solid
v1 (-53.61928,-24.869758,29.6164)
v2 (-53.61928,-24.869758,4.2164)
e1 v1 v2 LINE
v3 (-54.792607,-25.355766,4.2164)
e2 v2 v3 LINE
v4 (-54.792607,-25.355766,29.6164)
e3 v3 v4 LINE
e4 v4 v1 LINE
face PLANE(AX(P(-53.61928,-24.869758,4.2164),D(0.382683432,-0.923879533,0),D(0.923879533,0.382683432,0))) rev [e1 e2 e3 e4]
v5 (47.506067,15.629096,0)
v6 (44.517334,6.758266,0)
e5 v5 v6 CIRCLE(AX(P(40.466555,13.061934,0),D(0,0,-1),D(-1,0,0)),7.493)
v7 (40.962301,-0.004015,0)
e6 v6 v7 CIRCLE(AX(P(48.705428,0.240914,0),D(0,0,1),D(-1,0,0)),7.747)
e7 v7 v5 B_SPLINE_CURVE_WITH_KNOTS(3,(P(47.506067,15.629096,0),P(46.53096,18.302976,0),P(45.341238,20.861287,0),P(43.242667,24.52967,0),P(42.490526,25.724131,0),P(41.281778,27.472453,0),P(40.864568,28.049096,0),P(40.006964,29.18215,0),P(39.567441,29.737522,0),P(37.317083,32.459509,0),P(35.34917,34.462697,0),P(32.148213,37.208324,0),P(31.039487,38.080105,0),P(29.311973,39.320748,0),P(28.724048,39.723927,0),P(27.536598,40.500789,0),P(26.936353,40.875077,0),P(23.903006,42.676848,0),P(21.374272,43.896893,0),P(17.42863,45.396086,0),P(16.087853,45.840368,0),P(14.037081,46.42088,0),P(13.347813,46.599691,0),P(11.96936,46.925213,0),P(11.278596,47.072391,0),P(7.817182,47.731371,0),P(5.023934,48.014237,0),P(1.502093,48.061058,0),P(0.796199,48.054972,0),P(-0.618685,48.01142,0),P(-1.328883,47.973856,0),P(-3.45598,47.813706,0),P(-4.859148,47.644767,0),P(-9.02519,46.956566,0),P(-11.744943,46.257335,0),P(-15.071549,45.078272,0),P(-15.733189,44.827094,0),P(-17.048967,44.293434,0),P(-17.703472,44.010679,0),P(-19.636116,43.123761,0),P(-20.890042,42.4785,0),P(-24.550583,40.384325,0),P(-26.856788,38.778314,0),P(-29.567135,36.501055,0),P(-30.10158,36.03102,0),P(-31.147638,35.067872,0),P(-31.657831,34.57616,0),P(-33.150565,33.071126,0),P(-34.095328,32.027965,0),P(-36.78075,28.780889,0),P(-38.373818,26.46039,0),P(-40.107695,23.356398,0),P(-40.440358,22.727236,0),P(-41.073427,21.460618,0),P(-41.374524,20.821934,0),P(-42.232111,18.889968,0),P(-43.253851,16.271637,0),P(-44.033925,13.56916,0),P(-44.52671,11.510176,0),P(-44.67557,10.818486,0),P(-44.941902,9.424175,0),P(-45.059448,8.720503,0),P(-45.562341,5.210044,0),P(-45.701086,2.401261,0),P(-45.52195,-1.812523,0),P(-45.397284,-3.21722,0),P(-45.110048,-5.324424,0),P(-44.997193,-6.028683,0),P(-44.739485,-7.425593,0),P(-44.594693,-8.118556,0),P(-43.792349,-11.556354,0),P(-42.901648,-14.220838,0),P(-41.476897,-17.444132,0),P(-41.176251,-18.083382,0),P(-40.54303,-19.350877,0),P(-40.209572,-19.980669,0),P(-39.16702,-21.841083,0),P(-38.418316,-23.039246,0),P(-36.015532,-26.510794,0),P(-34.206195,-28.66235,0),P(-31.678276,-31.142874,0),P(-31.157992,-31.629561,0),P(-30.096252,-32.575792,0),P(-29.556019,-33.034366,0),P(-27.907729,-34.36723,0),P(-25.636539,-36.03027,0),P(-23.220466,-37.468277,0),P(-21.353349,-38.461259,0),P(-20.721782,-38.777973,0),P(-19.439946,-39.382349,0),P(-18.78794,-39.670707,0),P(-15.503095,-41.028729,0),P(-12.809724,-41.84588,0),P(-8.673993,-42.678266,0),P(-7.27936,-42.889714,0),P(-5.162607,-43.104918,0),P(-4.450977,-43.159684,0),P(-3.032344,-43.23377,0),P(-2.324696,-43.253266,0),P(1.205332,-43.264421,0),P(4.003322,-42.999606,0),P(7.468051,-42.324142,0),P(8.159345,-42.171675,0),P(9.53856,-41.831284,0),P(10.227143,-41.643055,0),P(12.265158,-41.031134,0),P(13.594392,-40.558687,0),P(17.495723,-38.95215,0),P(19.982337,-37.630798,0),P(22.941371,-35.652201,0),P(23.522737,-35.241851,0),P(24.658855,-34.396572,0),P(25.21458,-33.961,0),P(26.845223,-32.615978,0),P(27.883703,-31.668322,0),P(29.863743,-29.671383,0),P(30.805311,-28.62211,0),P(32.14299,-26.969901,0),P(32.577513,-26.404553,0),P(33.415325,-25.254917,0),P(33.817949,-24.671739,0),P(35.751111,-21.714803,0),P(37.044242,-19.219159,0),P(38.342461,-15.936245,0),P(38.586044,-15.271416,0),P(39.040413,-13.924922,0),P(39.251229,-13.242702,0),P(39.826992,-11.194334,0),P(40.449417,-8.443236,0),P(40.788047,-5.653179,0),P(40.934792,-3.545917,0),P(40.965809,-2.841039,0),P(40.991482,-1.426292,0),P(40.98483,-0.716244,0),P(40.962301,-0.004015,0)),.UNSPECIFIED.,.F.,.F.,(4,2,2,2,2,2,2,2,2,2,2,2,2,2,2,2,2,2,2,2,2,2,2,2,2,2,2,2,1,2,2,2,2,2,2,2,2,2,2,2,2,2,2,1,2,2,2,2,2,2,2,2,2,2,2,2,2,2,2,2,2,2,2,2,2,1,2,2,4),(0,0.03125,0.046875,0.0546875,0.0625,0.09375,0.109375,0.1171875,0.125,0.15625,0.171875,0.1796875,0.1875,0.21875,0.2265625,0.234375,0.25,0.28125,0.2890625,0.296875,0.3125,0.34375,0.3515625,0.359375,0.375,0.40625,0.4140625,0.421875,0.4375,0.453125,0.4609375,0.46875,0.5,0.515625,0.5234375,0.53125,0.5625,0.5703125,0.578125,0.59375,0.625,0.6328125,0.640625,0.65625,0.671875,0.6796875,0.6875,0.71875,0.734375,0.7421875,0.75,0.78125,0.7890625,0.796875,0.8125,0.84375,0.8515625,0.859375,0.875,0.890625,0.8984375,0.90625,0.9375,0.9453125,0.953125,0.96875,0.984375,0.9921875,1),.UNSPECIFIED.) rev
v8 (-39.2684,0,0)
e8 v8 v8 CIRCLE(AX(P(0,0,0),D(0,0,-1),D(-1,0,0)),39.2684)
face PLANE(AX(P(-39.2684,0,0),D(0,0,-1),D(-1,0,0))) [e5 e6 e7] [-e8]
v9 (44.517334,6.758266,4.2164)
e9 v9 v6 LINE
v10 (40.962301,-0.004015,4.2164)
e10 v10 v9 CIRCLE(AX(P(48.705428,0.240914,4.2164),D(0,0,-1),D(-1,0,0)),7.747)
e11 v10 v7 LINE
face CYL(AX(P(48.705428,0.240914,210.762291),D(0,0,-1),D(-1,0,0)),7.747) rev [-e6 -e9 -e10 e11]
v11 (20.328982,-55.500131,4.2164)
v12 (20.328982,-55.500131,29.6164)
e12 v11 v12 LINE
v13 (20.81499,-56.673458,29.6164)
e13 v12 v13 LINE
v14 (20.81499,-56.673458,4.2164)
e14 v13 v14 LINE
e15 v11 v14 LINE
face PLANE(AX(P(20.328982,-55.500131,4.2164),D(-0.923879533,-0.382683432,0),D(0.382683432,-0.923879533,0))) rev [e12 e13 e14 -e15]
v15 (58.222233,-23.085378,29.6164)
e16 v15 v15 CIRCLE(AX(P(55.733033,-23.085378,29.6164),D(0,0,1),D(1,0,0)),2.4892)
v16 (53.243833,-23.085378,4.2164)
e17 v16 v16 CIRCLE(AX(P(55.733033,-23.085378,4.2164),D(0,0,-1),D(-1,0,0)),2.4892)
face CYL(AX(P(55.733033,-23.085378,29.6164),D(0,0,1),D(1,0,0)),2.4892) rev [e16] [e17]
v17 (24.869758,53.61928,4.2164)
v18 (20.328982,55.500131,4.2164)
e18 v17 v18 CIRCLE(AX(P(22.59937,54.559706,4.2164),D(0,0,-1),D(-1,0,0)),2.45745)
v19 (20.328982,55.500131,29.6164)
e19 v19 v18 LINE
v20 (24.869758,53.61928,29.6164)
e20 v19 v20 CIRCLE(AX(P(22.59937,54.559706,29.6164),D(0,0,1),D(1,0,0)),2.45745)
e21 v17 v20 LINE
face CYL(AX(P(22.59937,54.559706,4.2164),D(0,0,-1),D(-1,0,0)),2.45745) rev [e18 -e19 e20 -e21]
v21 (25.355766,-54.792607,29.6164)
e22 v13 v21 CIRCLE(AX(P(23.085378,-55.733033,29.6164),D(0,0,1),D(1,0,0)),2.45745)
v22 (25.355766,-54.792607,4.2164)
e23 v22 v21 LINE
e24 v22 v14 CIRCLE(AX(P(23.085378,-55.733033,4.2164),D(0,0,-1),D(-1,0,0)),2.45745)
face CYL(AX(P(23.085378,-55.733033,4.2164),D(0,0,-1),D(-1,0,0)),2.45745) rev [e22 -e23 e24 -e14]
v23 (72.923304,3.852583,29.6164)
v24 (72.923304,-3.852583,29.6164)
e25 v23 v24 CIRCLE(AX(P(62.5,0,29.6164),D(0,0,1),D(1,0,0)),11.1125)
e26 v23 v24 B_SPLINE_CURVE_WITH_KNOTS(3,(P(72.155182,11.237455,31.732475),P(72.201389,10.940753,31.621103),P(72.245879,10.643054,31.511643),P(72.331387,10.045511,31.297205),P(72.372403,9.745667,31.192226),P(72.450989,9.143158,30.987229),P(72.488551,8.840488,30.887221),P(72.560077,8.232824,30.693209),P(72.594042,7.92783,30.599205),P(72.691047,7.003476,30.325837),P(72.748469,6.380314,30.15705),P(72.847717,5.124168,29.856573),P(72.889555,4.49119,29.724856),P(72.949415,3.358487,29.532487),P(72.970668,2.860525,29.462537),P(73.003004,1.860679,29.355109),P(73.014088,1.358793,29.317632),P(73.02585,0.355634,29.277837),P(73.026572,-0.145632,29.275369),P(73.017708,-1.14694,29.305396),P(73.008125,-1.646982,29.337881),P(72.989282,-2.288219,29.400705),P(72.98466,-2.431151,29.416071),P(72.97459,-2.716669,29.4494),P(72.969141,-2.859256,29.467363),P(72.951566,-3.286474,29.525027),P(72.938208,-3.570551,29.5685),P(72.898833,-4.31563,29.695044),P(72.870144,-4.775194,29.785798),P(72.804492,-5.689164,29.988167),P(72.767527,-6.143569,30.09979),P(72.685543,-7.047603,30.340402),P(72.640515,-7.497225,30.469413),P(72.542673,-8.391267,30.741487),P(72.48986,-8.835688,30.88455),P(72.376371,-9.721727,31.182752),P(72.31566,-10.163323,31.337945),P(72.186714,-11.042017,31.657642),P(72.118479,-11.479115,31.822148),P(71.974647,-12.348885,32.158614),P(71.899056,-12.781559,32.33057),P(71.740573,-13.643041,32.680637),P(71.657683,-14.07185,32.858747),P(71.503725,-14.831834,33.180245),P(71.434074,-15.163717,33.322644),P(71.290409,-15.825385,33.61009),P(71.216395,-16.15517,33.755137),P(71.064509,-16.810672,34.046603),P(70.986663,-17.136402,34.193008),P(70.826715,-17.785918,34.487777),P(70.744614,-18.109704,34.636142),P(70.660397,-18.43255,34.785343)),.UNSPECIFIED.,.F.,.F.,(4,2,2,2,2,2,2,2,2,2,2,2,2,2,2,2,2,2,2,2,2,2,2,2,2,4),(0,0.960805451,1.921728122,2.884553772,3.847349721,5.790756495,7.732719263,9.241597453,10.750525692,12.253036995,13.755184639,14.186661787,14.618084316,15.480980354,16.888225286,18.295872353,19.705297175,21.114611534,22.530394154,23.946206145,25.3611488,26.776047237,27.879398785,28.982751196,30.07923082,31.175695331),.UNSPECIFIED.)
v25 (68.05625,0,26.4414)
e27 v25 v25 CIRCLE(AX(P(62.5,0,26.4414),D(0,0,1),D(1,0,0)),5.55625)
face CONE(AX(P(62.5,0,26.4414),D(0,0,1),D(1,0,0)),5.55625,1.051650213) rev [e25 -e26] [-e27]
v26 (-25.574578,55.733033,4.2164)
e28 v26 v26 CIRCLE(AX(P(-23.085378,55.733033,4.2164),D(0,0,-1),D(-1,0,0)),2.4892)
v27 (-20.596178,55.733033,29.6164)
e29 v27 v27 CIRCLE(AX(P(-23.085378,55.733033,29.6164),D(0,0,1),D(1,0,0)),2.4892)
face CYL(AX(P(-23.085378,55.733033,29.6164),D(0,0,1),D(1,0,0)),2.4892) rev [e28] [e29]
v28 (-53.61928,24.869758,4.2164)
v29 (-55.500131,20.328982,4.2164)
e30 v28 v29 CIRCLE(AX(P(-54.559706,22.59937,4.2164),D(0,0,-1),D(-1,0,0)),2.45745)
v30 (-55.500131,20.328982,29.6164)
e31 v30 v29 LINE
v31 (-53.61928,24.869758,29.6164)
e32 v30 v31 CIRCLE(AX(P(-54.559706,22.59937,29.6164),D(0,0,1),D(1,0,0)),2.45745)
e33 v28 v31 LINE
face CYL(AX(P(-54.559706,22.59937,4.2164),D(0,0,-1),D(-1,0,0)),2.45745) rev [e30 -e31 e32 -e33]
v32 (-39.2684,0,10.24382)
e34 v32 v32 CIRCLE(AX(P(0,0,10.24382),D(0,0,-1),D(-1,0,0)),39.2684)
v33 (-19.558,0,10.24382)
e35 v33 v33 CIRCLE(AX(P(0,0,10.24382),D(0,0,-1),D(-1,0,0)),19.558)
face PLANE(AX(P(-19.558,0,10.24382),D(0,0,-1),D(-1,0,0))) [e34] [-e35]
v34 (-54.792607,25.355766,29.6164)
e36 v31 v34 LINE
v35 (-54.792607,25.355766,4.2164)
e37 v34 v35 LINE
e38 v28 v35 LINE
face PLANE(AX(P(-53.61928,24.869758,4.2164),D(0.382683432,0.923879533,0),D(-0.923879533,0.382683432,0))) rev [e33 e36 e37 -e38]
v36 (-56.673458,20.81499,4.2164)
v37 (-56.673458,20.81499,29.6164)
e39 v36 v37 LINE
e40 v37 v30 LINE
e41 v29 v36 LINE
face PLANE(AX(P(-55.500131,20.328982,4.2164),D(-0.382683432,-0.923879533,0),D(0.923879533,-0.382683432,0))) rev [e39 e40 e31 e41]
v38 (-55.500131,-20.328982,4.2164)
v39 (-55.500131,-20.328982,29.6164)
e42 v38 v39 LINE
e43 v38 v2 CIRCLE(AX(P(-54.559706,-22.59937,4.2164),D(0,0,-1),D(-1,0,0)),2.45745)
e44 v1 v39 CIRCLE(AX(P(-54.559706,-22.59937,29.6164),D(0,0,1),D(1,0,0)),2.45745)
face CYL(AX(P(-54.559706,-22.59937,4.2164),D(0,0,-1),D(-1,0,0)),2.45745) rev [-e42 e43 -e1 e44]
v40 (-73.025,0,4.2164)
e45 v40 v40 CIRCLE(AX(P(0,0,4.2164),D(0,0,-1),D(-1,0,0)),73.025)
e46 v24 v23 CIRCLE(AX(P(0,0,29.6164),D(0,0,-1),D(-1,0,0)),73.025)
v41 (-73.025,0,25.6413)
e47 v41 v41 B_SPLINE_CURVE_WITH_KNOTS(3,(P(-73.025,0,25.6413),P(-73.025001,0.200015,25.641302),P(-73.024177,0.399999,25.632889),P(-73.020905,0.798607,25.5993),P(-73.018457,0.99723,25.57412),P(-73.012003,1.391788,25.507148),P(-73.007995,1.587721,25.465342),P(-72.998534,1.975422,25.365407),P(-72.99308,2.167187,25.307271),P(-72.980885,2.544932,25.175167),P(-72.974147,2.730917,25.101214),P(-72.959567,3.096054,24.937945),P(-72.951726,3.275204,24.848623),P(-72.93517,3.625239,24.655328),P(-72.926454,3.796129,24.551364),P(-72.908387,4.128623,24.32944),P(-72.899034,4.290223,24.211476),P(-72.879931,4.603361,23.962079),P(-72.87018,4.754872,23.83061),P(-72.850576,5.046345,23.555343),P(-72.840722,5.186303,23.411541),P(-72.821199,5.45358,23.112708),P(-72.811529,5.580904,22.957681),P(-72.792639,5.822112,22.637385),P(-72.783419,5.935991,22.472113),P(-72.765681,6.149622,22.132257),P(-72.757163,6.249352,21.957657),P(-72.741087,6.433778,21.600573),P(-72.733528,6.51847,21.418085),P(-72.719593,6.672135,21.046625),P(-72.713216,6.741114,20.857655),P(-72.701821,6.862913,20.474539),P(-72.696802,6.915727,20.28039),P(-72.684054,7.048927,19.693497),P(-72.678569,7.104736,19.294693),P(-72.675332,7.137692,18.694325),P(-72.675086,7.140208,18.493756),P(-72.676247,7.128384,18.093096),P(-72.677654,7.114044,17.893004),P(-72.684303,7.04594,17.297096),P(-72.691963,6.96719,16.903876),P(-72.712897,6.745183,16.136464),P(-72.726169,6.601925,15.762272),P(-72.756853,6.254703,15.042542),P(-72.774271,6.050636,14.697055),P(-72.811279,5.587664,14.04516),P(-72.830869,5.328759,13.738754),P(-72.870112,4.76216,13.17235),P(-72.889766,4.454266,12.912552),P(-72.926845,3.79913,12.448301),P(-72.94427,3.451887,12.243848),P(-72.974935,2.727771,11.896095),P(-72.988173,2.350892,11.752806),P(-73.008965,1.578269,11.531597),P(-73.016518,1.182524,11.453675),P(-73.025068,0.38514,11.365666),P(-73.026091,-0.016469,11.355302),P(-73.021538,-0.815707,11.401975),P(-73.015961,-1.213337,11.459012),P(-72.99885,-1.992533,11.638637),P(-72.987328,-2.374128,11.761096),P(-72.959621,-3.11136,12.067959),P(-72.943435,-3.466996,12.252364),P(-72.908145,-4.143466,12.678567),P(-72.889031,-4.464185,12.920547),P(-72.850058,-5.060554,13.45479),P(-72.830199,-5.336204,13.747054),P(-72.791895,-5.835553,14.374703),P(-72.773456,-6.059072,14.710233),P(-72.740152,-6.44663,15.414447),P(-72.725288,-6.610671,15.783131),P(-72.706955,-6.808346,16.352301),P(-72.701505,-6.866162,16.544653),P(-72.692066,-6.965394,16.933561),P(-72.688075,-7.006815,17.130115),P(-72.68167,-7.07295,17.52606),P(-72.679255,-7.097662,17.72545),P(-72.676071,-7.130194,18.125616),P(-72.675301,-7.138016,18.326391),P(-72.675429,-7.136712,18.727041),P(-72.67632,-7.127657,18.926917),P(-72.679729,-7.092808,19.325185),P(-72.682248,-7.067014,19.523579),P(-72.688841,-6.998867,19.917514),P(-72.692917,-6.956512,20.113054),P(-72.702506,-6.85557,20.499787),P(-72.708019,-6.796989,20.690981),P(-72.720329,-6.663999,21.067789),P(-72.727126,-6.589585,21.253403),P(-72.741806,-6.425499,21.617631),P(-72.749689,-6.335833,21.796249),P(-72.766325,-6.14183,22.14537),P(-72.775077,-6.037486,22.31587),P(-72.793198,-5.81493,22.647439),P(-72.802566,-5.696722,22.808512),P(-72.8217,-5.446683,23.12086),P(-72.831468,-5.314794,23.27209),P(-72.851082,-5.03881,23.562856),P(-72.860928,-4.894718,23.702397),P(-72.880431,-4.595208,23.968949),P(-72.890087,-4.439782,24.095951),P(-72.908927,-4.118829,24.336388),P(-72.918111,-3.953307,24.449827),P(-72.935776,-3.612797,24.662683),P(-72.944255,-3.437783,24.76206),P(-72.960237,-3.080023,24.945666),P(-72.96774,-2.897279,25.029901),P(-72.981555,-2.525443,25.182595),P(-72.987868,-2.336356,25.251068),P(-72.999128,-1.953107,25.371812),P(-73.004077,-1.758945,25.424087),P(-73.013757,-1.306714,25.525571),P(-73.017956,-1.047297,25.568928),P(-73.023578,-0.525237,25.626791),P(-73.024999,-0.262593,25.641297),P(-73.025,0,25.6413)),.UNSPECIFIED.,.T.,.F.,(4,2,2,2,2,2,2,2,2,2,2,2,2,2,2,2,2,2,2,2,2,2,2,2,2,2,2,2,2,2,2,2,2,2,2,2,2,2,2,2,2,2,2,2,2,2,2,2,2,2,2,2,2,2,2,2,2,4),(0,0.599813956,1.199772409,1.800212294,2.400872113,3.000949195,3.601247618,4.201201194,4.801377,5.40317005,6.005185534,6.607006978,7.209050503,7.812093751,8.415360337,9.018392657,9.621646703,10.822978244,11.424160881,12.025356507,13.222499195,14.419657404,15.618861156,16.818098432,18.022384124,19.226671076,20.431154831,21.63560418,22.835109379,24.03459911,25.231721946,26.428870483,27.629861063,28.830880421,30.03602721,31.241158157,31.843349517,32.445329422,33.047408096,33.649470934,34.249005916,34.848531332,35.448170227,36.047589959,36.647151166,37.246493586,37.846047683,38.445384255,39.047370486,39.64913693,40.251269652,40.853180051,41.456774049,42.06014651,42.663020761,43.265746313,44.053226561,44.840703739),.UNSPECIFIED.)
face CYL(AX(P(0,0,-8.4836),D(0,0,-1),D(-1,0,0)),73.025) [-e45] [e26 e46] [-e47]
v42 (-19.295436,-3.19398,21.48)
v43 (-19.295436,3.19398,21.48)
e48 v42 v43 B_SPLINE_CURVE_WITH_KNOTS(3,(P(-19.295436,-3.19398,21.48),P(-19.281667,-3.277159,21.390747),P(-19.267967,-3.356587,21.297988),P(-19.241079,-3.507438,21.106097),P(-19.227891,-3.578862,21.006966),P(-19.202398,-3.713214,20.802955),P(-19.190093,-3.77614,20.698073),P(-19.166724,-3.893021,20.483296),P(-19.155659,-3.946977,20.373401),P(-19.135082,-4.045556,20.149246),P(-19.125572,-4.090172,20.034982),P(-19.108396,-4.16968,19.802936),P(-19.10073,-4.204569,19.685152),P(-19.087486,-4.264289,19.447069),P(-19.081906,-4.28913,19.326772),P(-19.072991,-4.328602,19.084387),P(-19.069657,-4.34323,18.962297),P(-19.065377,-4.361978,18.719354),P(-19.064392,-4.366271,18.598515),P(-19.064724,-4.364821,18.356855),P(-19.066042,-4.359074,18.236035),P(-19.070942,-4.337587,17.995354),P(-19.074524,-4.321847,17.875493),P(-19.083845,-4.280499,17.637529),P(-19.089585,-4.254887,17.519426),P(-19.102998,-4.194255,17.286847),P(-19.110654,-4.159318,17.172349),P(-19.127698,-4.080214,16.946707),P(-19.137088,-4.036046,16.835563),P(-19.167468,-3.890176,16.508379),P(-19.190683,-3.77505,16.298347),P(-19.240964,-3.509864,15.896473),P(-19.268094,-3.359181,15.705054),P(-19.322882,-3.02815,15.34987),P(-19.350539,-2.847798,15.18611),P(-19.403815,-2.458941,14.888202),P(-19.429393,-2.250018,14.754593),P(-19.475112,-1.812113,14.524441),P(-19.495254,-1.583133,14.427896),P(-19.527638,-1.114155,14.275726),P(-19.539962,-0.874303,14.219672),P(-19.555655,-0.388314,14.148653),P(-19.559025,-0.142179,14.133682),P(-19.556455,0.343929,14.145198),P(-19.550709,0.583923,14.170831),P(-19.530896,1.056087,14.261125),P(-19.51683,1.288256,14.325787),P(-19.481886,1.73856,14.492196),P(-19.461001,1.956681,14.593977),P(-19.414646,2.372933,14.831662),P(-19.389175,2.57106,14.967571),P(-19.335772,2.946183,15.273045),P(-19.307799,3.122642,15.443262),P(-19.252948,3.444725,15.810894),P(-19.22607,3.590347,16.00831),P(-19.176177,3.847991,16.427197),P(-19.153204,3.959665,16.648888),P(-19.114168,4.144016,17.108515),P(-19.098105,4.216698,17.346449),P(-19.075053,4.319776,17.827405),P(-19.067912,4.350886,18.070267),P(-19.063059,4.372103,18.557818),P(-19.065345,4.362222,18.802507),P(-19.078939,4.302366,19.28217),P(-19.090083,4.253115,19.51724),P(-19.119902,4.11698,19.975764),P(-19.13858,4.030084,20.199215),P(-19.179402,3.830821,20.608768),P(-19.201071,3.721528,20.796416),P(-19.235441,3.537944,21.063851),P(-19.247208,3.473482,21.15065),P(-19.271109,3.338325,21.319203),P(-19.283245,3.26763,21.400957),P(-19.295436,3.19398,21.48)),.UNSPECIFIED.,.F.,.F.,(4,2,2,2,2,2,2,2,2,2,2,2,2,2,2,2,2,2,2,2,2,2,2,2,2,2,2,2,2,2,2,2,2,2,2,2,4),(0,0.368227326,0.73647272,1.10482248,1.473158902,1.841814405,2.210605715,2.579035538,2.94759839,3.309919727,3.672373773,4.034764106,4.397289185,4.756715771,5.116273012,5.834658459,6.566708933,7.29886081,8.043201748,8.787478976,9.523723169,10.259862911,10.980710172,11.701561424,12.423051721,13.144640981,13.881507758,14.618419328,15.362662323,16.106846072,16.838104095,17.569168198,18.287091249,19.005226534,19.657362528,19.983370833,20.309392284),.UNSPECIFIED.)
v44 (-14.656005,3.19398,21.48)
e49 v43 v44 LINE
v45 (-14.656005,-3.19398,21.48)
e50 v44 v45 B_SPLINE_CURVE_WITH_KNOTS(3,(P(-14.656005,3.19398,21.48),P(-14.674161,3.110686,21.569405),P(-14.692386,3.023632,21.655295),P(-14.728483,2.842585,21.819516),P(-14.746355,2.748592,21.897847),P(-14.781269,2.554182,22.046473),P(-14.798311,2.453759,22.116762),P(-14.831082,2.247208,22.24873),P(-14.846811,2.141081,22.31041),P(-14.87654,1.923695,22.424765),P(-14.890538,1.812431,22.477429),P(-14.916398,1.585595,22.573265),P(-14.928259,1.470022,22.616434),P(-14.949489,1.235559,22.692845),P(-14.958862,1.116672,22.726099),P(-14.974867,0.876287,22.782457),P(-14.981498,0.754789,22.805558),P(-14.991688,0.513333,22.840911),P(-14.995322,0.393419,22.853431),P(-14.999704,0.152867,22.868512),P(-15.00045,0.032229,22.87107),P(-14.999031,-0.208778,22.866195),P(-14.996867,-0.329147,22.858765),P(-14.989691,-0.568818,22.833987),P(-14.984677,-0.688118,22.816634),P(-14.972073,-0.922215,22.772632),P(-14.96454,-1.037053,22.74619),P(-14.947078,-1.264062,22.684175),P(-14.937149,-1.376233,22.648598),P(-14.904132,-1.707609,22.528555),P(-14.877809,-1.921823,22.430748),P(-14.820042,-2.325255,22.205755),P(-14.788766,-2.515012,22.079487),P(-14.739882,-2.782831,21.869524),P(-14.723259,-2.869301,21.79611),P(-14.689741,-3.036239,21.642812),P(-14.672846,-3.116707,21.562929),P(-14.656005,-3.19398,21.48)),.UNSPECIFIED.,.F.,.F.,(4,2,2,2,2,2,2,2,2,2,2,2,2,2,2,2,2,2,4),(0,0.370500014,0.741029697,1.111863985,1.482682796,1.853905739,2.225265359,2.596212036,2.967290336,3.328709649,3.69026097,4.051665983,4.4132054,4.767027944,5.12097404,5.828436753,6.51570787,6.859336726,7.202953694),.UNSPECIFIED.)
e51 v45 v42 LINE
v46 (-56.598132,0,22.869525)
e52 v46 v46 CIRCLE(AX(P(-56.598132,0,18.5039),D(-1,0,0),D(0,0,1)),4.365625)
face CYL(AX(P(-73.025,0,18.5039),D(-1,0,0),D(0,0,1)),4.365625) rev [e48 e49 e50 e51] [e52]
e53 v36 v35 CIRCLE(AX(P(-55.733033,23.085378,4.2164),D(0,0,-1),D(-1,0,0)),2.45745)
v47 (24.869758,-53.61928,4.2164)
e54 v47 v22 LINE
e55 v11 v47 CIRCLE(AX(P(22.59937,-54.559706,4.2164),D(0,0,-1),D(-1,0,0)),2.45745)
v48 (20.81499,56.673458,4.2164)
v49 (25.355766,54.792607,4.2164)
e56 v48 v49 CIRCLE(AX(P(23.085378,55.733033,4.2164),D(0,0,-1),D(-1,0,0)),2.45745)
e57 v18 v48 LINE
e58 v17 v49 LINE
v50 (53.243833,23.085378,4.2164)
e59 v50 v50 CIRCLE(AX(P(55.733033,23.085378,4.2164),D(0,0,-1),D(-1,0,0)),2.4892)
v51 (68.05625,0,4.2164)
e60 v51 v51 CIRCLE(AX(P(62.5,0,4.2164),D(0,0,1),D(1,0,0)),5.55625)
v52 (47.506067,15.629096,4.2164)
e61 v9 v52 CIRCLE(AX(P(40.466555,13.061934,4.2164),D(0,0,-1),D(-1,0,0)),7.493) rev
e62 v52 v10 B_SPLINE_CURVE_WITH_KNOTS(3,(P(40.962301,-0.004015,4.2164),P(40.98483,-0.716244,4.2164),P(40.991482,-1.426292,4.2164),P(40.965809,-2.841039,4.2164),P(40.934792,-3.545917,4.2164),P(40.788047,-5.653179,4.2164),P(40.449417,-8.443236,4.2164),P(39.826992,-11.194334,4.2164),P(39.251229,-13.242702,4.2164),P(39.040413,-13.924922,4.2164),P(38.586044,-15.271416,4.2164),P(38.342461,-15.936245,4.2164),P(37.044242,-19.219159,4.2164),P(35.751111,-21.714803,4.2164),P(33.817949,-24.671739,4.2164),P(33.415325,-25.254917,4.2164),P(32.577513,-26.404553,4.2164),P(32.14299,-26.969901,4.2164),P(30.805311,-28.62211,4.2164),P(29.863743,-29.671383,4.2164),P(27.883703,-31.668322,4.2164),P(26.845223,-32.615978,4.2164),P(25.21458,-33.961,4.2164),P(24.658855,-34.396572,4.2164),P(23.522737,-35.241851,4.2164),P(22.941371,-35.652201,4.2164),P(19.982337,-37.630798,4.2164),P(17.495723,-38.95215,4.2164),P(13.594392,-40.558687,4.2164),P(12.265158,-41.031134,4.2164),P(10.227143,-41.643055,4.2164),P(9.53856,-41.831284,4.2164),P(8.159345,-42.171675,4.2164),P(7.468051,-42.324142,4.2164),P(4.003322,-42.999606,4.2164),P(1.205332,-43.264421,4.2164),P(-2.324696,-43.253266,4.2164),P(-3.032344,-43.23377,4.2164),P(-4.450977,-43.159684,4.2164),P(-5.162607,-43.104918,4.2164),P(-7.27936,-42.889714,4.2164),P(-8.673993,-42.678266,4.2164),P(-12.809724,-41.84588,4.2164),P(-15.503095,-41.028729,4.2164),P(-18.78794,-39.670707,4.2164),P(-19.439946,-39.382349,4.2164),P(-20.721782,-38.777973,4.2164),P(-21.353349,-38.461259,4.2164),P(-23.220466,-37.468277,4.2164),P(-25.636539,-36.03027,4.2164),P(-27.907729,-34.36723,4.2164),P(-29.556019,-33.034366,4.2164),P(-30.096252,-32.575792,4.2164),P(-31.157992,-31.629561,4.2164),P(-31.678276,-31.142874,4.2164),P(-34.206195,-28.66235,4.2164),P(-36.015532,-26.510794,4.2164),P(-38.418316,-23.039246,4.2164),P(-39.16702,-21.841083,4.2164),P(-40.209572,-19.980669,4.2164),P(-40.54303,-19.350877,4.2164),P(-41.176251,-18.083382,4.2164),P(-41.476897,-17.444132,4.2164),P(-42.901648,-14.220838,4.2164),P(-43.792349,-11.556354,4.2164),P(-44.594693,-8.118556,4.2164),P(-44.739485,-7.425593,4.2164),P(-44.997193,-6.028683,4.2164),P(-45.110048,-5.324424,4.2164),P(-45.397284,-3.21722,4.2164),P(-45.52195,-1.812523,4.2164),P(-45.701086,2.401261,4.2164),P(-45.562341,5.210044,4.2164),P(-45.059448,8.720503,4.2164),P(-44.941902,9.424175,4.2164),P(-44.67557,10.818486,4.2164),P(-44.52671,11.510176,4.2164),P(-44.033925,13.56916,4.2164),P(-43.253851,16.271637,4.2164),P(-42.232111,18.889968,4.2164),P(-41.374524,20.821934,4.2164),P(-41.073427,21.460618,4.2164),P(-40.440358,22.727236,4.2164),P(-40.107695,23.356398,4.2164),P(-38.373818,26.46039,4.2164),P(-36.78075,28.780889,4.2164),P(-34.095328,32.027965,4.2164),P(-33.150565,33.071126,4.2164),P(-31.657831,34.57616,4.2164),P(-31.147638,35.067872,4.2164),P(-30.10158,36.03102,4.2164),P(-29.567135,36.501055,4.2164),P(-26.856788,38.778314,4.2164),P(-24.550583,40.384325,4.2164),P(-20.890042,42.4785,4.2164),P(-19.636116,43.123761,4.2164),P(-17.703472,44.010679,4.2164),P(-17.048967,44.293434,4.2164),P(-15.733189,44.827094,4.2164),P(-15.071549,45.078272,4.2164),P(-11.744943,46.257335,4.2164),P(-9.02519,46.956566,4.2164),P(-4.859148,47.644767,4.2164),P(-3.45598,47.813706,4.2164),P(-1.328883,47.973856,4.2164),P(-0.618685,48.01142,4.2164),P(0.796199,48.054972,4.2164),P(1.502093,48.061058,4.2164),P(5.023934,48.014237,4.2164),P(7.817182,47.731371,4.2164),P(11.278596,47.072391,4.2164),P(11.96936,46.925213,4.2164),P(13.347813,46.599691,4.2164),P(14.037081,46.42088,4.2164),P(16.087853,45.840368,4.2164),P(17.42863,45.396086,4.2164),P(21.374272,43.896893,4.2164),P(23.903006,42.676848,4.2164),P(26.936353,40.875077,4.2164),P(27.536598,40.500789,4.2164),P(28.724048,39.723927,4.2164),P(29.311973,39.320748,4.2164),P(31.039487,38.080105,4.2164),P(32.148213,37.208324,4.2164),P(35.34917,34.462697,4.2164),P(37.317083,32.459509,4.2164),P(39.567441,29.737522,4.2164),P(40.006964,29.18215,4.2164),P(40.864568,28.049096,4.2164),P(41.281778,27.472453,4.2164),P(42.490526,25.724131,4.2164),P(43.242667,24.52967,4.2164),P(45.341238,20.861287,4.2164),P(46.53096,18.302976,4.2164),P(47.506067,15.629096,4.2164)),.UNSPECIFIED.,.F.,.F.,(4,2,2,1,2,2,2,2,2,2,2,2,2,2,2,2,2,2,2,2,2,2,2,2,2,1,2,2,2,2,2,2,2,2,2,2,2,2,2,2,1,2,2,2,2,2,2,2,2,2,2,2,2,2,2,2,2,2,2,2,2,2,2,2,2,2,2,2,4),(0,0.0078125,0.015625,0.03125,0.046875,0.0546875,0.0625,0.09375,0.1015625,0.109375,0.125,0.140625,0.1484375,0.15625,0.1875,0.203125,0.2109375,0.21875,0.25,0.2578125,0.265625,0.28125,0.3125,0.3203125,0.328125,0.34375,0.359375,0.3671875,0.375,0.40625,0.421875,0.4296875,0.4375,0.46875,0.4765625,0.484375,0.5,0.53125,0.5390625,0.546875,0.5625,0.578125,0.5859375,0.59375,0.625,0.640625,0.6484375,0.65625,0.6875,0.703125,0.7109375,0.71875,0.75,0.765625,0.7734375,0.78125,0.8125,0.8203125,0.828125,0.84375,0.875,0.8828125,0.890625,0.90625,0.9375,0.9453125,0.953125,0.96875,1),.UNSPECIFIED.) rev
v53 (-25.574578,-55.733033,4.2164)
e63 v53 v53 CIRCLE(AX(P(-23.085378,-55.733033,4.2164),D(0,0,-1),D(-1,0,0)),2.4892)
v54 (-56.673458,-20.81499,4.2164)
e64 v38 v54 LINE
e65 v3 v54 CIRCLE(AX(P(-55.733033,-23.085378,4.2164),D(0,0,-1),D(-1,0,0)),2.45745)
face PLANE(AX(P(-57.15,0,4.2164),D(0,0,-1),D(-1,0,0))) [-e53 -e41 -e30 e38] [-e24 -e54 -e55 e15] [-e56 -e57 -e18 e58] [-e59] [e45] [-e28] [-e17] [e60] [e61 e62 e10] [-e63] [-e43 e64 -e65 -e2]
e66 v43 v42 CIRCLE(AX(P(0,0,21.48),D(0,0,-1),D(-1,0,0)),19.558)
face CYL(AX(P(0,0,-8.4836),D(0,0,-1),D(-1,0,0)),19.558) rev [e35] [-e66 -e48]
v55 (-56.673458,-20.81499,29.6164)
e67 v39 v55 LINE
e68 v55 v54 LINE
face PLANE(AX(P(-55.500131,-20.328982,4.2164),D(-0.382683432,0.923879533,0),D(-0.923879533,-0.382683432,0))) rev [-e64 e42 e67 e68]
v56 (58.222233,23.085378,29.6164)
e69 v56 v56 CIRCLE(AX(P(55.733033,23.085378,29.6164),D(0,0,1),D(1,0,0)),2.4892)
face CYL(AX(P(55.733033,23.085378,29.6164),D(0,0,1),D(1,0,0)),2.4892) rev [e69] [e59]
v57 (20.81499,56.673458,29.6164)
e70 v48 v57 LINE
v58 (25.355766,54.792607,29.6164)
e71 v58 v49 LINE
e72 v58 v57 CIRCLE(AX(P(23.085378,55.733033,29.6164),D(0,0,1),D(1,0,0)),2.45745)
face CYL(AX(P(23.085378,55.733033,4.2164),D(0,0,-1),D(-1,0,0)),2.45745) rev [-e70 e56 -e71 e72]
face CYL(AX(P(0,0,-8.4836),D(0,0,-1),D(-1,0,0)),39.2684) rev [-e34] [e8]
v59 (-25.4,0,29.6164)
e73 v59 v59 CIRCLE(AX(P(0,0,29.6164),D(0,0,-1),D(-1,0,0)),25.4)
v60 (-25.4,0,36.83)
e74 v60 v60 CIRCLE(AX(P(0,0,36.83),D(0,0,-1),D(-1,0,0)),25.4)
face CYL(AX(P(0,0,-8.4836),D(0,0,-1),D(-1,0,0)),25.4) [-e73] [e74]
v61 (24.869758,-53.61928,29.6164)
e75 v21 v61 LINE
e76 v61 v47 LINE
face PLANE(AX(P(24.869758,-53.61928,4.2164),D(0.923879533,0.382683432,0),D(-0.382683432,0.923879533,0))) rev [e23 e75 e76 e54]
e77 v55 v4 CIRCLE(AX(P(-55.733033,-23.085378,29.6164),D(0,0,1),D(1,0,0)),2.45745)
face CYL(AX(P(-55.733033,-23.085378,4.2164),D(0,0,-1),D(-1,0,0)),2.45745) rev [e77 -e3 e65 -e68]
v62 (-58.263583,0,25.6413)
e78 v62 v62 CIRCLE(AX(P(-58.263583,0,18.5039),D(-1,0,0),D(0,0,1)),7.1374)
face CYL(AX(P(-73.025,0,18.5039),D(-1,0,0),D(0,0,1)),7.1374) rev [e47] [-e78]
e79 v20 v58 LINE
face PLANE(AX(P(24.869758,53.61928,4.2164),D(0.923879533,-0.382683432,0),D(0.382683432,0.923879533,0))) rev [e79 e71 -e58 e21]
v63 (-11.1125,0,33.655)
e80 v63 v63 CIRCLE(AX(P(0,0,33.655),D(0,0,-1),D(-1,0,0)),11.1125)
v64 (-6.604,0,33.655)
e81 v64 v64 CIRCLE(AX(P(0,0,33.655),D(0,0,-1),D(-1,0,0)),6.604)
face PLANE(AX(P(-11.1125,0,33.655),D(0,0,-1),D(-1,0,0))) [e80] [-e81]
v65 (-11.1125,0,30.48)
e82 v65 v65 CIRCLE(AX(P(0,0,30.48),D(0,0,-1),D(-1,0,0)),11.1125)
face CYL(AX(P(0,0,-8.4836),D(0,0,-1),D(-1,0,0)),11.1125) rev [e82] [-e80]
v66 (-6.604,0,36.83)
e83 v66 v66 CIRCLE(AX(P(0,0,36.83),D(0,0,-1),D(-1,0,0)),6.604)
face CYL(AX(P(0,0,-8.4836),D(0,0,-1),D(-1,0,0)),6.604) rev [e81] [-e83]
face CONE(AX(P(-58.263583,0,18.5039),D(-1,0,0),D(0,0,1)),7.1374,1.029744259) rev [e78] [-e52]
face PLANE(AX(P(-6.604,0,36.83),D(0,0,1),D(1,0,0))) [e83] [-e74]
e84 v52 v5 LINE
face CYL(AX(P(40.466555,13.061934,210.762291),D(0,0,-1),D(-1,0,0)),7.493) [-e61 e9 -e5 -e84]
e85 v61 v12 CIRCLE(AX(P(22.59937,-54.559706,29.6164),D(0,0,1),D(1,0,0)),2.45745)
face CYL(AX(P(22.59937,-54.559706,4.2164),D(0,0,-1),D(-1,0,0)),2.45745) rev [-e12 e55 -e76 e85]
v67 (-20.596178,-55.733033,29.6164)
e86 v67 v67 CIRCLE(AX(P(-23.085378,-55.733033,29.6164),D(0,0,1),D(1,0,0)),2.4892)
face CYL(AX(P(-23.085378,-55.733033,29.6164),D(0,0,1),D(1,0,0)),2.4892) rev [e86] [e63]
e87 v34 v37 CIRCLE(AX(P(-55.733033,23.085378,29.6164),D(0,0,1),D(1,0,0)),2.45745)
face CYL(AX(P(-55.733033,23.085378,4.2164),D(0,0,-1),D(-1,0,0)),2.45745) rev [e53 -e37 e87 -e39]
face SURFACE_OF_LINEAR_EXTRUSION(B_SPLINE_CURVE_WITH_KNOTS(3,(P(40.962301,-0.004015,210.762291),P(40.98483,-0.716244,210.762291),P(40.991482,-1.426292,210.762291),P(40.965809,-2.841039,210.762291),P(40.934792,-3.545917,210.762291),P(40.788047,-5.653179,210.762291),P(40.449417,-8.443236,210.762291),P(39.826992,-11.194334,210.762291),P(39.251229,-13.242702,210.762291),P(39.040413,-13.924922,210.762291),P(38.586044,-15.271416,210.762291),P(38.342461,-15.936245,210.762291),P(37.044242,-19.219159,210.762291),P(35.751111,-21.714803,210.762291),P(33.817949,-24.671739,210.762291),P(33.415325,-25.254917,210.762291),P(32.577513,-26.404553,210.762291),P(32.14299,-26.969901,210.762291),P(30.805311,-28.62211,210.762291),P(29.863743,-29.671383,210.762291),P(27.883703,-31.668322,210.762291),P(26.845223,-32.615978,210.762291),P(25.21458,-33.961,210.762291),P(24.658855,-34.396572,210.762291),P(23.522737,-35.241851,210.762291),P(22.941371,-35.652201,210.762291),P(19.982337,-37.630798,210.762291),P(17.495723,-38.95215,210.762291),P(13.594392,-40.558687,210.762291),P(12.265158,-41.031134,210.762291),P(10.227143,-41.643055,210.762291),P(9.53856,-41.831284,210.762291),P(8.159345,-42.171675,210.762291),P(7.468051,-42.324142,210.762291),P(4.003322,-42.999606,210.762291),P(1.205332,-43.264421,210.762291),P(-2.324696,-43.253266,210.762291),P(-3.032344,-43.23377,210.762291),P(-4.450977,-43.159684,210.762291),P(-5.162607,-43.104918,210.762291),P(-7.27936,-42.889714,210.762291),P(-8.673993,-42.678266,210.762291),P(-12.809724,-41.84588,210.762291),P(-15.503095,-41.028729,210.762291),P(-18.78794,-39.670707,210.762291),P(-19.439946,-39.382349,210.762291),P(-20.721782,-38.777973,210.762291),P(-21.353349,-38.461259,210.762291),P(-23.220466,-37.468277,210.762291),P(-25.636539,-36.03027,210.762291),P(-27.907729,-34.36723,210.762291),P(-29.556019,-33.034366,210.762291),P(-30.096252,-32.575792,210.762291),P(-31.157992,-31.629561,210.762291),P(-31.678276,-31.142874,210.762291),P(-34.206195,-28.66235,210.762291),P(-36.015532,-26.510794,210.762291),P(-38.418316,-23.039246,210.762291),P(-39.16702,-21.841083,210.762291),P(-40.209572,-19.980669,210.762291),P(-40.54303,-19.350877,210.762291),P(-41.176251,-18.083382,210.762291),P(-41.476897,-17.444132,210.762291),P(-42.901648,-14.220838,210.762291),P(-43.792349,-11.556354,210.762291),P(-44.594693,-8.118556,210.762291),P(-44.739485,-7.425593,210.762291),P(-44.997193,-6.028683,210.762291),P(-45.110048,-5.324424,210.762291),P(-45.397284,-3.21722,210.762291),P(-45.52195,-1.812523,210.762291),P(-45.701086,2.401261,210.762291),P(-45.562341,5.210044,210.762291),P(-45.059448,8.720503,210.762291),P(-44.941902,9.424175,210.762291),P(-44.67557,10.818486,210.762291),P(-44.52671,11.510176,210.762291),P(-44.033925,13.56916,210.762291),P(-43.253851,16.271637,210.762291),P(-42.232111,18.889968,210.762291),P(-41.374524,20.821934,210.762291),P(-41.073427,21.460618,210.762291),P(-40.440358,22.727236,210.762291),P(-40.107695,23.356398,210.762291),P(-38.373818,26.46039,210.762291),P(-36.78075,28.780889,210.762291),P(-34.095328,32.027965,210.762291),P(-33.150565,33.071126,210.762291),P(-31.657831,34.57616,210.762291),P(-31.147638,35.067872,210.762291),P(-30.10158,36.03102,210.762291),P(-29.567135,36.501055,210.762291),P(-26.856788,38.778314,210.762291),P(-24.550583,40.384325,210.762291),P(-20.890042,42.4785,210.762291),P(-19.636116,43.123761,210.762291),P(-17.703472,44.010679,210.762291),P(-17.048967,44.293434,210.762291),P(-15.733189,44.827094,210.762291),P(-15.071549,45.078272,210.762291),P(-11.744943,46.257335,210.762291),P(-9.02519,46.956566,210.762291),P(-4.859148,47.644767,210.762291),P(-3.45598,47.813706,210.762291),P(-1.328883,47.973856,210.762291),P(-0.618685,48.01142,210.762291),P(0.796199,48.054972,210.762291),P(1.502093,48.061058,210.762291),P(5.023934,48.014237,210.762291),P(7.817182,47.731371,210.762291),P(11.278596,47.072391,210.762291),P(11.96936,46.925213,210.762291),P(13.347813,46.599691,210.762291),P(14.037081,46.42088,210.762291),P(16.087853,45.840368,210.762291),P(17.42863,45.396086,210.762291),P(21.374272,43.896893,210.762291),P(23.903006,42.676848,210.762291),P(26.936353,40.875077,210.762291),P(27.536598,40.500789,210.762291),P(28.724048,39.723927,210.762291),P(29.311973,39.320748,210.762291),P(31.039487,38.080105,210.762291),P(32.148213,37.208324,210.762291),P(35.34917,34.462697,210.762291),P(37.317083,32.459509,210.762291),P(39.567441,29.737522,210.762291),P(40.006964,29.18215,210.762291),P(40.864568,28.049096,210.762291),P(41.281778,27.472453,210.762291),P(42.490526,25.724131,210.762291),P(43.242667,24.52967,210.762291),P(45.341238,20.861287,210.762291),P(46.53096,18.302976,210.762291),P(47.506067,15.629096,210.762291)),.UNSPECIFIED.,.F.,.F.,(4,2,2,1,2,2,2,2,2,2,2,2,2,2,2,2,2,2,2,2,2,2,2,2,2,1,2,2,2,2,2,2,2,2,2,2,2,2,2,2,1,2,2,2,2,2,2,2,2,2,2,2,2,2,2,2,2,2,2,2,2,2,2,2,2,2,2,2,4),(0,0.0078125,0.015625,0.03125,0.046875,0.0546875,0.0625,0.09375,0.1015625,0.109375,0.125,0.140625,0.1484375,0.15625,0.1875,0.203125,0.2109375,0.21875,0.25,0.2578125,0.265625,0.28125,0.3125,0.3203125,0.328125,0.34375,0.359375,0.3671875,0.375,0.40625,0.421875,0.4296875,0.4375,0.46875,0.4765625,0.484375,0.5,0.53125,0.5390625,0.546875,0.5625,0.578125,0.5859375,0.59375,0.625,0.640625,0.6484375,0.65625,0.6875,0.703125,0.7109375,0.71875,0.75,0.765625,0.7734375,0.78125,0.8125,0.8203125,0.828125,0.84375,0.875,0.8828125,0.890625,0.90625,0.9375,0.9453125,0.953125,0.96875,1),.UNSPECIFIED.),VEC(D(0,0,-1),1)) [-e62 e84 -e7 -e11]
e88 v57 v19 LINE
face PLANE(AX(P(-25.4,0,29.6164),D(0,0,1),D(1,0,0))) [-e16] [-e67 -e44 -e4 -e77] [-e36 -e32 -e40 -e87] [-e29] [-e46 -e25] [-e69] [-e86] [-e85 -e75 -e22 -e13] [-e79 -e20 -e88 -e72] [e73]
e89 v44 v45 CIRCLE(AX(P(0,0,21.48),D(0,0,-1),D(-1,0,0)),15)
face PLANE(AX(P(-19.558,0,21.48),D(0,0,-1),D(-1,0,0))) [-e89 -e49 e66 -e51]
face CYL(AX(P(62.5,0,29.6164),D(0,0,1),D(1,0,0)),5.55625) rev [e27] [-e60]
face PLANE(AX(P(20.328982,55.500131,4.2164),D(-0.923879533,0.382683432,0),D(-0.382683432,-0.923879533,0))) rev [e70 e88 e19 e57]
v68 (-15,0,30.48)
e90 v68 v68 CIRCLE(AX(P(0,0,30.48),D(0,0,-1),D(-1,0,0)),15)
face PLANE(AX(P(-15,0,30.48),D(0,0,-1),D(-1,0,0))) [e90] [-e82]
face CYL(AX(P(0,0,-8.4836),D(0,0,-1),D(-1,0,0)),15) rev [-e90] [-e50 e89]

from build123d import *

# Parameters (mm, degrees)
CUT_EXTRUDE1_START                   = 4.2164
SKETCH18_R                           = 57.15
CUT_EXTRUDE1_DEPTH                   = 4.2164
F_11_32_0_34375_DIAMETER_HOLE1_D     = 8.73125
F_11_32_0_34375_DIAMETER_HOLE1_DEPTH = 76.2
F_11_32_0_34375_DIAMETER_HOLE1_TIP   = 2.62313214
PIPE_TAP_DRILL_FOR_3_8_TAP2_D        = 14.2748
PIPE_TAP_DRILL_FOR_3_8_TAP2_DEPTH    = 14.761417418
PIPE_TAP_DRILL_FOR_3_8_TAP2_TIP      = 4.288582582
F_10_CLEARANCE_HOLE1_D               = 4.9784
CIRPATTERN1_COUNT                    = 8
CLEARANCING_START                    = -4.2164
SKETCH32_R                           = 73.025
CLEARANCING_DEPTH                    = 4.2164
F_10_START                           = 4.2164
F_10_0_1935_DIAMETER_SLOT1_DEPTH     = 25.4
CIRPATTERN2_COUNT                    = 8


# Read off the part's stored shape, not the designer's step: #10 (0.1935) Diameter Slot1
with BuildPart() as part:
    # Sketch25 → Revolve1 (revolve)
    with BuildSketch(Plane(origin=(0, 0, 0), x_dir=(1, 0, 0), z_dir=(0, 1, 0))):
        Polygon((-19.558, -21.48), (-19.558, -10.24382), (-39.2684, -10.24382), (-39.2684, 0), (-57.15, 0), (-57.15, -4.2164), (-73.025, -4.2164), (-73.025, -29.6164), (-25.4, -29.6164), (-25.4, -36.83), (-6.604, -36.83), (-6.604, -33.655), (-11.1125, -33.655), (-11.1125, -30.48), (-15, -30.48), (-15, -21.48), align=None)
    revolve(axis=Axis((0, 0, -8.4836), (0, 0, 1)))

    # Sketch18 → Cut-Extrude1 (cut)
    with BuildSketch(Plane.XY.offset(CUT_EXTRUDE1_START)):
        Circle(SKETCH18_R)
        with BuildLine():
            add(Edge.make_bspline(
                [(41.089237213, 0), (41.091962531, -0.086157587), (41.097413749, -0.258491166), (41.10355964, -0.517077072), (41.10820678, -0.775748178), (41.11421023, -1.293415642), (41.109015311, -2.589274196), (41.017814103, -4.490313926), (40.7831208, -6.729807087), (40.462314107, -8.787506492), (40.037808727, -10.829994254), (39.510298345, -12.852043551), (38.880746853, -14.848458078), (38.15038378, -16.814086746), (37.320701547, -18.743836999), (36.393451781, -20.63268838), (35.370641466, -22.475705706), (34.254528452, -24.268052099), (33.047616433, -26.005001751), (31.752649319, -27.681952446), (30.372605018, -29.294437787), (28.910688618, -30.83813911), (27.370324987, -32.308897058), (25.755150794, -33.702722776), (24.069005972, -35.015808715), (22.315924639, -36.244539), (20.500125495, -37.385499343), (18.62600172, -38.435486481), (16.698110388, -39.3915171), (14.721161433, -40.250836227), (12.700006186, -41.010925075), (10.639625512, -41.669508306), (8.545117571, -42.224560694), (6.421685244, -42.674313186), (4.274623243, -43.017258312), (2.109304944, -43.252154961), (-0.068831028, -43.378032487), (-2.254294428, -43.394194133), (-4.441557201, -43.300219785), (-6.625067428, -43.095968006), (-8.799263397, -42.781577389), (-10.958587737, -42.35746718), (-13.097501591, -41.8243372), (-15.210498799, -41.183167044), (-17.292120038, -40.435214565), (-19.336966901, -39.582013644), (-21.339715858, -38.62537124), (-23.295132091, -37.567363743), (-25.198083132, -36.410332623), (-27.043552306, -35.156879378), (-28.826651909, -33.809859817), (-30.542636113, -32.372377659), (-32.186913551, -30.847777489), (-33.75505955, -29.239637062), (-35.242827981, -27.551758997), (-36.6461627, -25.788161864), (-37.961208531, -23.953070684), (-39.184321792, -22.050906876), (-40.312080298, -20.086277666), (-41.34129285, -18.063964982), (-42.269008156, -15.988913871), (-43.092523175, -13.866220454), (-43.809390856, -11.701119456), (-44.417427247, -9.498971339), (-44.914717965, -7.265249075), (-45.299623986, -5.005524575), (-45.570786769, -2.725454833), (-45.727132667, -0.430767795), (-45.767876634, 1.872751999), (-45.692525205, 4.179277959), (-45.500878745, 6.482956161), (-45.193032951, 8.777920163), (-44.76937961, 11.058305925), (-44.2306066, 13.318266753), (-43.577697135, 15.551988265), (-42.811928261, 17.753703317), (-41.934868588, 19.917706858), (-40.948375273, 22.038370685), (-39.854590259, 24.110158043), (-38.655935769, 26.127638043), (-37.35510908, 28.085499861), (-35.95507656, 29.978566677), (-34.45906702, 31.801809315), (-32.870564351, 33.550359561), (-31.193299507, 35.2195231), (-29.431241811, 36.804792072), (-27.58858964, 38.301857174), (-25.669760482, 39.706619311), (-23.67938041, 41.015200739), (-21.62227298, 42.22395569), (-19.503447594, 43.329480427), (-17.328087349, 44.32862273), (-15.101536401, 45.218490759), (-12.829286876, 45.996461288), (-10.51696536, 46.660187279), (-8.170319005, 47.207604779), (-5.795201275, 47.63693911), (-3.397557376, 47.946710349), (-0.983409407, 48.13573807), (1.441158736, 48.203145338), (3.870016668, 48.148361942), (6.297002983, 47.971126851), (8.715940862, 47.671489899), (11.120653763, 47.249812672), (13.504981164, 46.706768607), (15.862794321, 46.043342297), (18.188011992, 45.260827993), (20.47461609, 44.360827321), (22.71666723, 43.345246195), (24.908320125, 42.216290953), (27.043838787, 40.976463712), (29.117611505, 39.628556947), (31.12416555, 38.175647316), (33.058181574, 36.621088743), (34.914507669, 34.968504765), (36.688173034, 33.221780166), (38.374401232, 31.385051924), (39.968622994, 29.462699478), (41.466488529, 27.459334348), (42.863879321, 25.37978913), (44.156919368, 23.229105887), (45.341985843, 21.012523976), (46.415719137, 18.735467323), (47.152873419, 16.943563677), (47.537044371, 15.914838228), (47.625380995, 15.672606956)],
                knots=[0, 0, 0, 0, 0.000898736, 0.001797664, 0.002696784, 0.003596095, 0.007195255, 0.016206602, 0.023429565, 0.030664921, 0.03791271, 0.04517297, 0.052445735, 0.059731037, 0.067028905, 0.074339368, 0.081662453, 0.088998186, 0.096346593, 0.103707696, 0.111081519, 0.118468084, 0.125867414, 0.13327953, 0.140704451, 0.148142199, 0.155592793, 0.163056252, 0.170532595, 0.178021841, 0.185524007, 0.193039111, 0.200567171, 0.208108204, 0.215662226, 0.223229255, 0.230809306, 0.238402396, 0.24600854, 0.253627754, 0.261260054, 0.268905454, 0.27656397, 0.284235617, 0.291920409, 0.29961836, 0.307329485, 0.315053798, 0.322791313, 0.330542044, 0.338306004, 0.346083208, 0.353873668, 0.361677398, 0.369494411, 0.37732472, 0.385168337, 0.393025277, 0.400895551, 0.408779172, 0.416676152, 0.424586504, 0.432510241, 0.440447374, 0.448397915, 0.456361877, 0.464339271, 0.472330109, 0.480334403, 0.488352164, 0.496383405, 0.504428136, 0.512486369, 0.520558115, 0.528643386, 0.536742193, 0.544854546, 0.552980457, 0.561119937, 0.569272997, 0.577439648, 0.585619899, 0.593813763, 0.60202125, 0.61024237, 0.618477134, 0.626725552, 0.634987634, 0.643263392, 0.651552835, 0.659855974, 0.668172818, 0.676503379, 0.684847665, 0.693205688, 0.701577457, 0.709962981, 0.718362272, 0.726775338, 0.73520219, 0.743642837, 0.752097289, 0.760565555, 0.769047646, 0.777543571, 0.786053339, 0.79457696, 0.803114443, 0.811665798, 0.820231034, 0.828810161, 0.837403187, 0.846010122, 0.854630975, 0.863265756, 0.871914473, 0.880577136, 0.889253753, 0.897944334, 0.906648887, 0.915367423, 0.924099948, 0.932846474, 0.941607007, 0.944295232, 0.944295232, 0.944295232, 0.944295232], degree=3))
            ThreePointArc((47.625380995, 15.672606956), (47.687720846, 10.629001226), (44.585991464, 6.651424093))
            ThreePointArc((44.585991464, 6.651424093), (41.960682048, 3.786728615), (41.089237213, 0))
        make_face(mode=Mode.SUBTRACT)
    extrude(amount=-CUT_EXTRUDE1_DEPTH, mode=Mode.SUBTRACT)

    # 11/32 (0.34375) Diameter Hole1
    with Locations(Plane(origin=(-73.025, 0, 18.5039), x_dir=(0, 0, -1), z_dir=(-1, 0, 0))):
        with Locations((0, 0)):
            Hole(F_11_32_0_34375_DIAMETER_HOLE1_D / 2, depth=F_11_32_0_34375_DIAMETER_HOLE1_DEPTH)
            with Locations((0, 0, -(F_11_32_0_34375_DIAMETER_HOLE1_DEPTH + F_11_32_0_34375_DIAMETER_HOLE1_TIP / 2))):  # 118° drill point
                Cone(0, F_11_32_0_34375_DIAMETER_HOLE1_D / 2, F_11_32_0_34375_DIAMETER_HOLE1_TIP, mode=Mode.SUBTRACT)

    # Sketch20 one side → Turbine Shaft Hole (revolve, cut)
    with BuildSketch(Plane(origin=(0, 0, 0), x_dir=(1, 0, 0), z_dir=(0, 1, 0)), mode=Mode.PRIVATE) as turbine_shaft_hole_sk:
        Polygon((56.94375, -26.4414), (51.3875, -29.6164), (62.5, -29.6164), (62.5, -4.2164), (56.94375, -4.2164), align=None)
    revolve(turbine_shaft_hole_sk.sketch.rotate(Axis((62.5, 0, 29.6164), (0, 0, -1)), 180), axis=Axis((62.5, 0, 29.6164), (0, 0, -1)), mode=Mode.SUBTRACT)

    # Pipe Tap Drill for 3/8 Tap2
    with Locations(Plane(origin=(-73.025, 0, 18.5039), x_dir=(0, 0, -1), z_dir=(-1, 0, 0))):
        with Locations((0, 0)):
            Hole(PIPE_TAP_DRILL_FOR_3_8_TAP2_D / 2, depth=PIPE_TAP_DRILL_FOR_3_8_TAP2_DEPTH)
            with Locations((0, 0, -(PIPE_TAP_DRILL_FOR_3_8_TAP2_DEPTH + PIPE_TAP_DRILL_FOR_3_8_TAP2_TIP / 2))):  # 118° drill point
                Cone(0, PIPE_TAP_DRILL_FOR_3_8_TAP2_D / 2, PIPE_TAP_DRILL_FOR_3_8_TAP2_TIP, mode=Mode.SUBTRACT)

    # #10 Clearance Hole1 (through all)
    with Locations(Plane(origin=(55.733032799, -23.085378057, 29.6164), x_dir=(1, 0, 0), z_dir=(0, 0, 1))):
        with Locations((0, 0)):
            f_10_clearance_hole1 = Hole(F_10_CLEARANCE_HOLE1_D / 2)

    # CirPattern1: #10 Clearance Hole1 ×8 about axis, 4 skipped
    cirpattern1_axis = Axis((0, 0, 0), (0, 0, 1))
    add([f_10_clearance_hole1.rotate(cirpattern1_axis, i * 360 / CIRPATTERN1_COUNT) for i in range(1, CIRPATTERN1_COUNT) if i not in (2, 4, 5, 7)], mode=Mode.SUBTRACT)

    # Sketch32 → Clearancing (cut)
    with BuildSketch(Plane(origin=(0, 0, 0), x_dir=(-1, 0, 0), z_dir=(0, 0, -1)).offset(CLEARANCING_START)):
        Circle(SKETCH32_R)
        with BuildLine():
            ThreePointArc((-47.506067229, 15.629095748), (-47.567368082, 10.669550114), (-44.51733419, 6.758265932))
            ThreePointArc((-44.51733419, 6.758265932), (-41.848269617, 3.845825531), (-40.962300701, -0.004015228))
            add(Edge.make_bspline(
                [(-40.962300701, -0.004015228), (-40.984829754, -0.716243545), (-40.991482345, -1.426292399), (-40.965808515, -2.841039211), (-40.934791994, -3.545916987), (-40.788046598, -5.65317915), (-40.449416827, -8.44323574), (-39.826992242, -11.194334019), (-39.251228801, -13.242702158), (-39.04041264, -13.924921757), (-38.586043887, -15.271416492), (-38.342460818, -15.936244836), (-37.044241995, -19.219159068), (-35.751111298, -21.714802599), (-33.817948717, -24.671739224), (-33.415325439, -25.254916955), (-32.577512865, -26.404553153), (-32.142989691, -26.969901223), (-30.805310798, -28.622109954), (-29.863742521, -29.67138319), (-27.88370287, -31.668321975), (-26.84522274, -32.615978344), (-25.214580249, -33.961000268), (-24.658855428, -34.396572383), (-23.52273746, -35.241850655), (-22.941371199, -35.652200602), (-19.982337143, -37.630798215), (-17.495723306, -38.952149767), (-13.594391809, -40.558687212), (-12.265158452, -41.031133778), (-10.227142901, -41.643055288), (-9.538560062, -41.831284287), (-8.159344959, -42.171675018), (-7.468051402, -42.324142065), (-4.003321953, -42.999606071), (-1.205332292, -43.264420661), (2.324696242, -43.253266134), (3.032343885, -43.233770306), (4.450976737, -43.159684207), (5.16260658, -43.104918353), (7.279359647, -42.889714494), (8.673993393, -42.678265993), (12.809724164, -41.845880015), (15.503095197, -41.028729387), (18.787939685, -39.670706521), (19.439945622, -39.382349429), (20.721782261, -38.777972555), (21.353348612, -38.461258619), (23.220466367, -37.468277477), (25.636538884, -36.03026989), (27.907728904, -34.367230475), (29.556019298, -33.034366172), (30.096251631, -32.575792031), (31.157992098, -31.629561277), (31.678275818, -31.142874487), (34.206194586, -28.662350465), (36.015531715, -26.510793678), (38.41831625, -23.039245987), (39.16701973, -21.841083162), (40.20957198, -19.98066895), (40.543029676, -19.350876534), (41.176251076, -18.083381709), (41.476896624, -17.444132119), (42.901648241, -14.220838418), (43.792349276, -11.556354365), (44.594692676, -8.118555948), (44.739484647, -7.425593495), (44.997193357, -6.028683216), (45.110048425, -5.324423569), (45.397284161, -3.217220036), (45.521950193, -1.812522973), (45.701086012, 2.401261181), (45.562340657, 5.210043831), (45.059447785, 8.720503026), (44.941902272, 9.424175437), (44.675570213, 10.818485677), (44.526710242, 11.510176401), (44.03392467, 13.569160455), (43.253850892, 16.271636591), (42.232110927, 18.889968175), (41.374523909, 20.821933821), (41.073427004, 21.460617921), (40.440358133, 22.727235888), (40.107694699, 23.35639756), (38.373818129, 26.460390162), (36.780750271, 28.78088885), (34.095328382, 32.027965174), (33.150564893, 33.07112628), (31.657831232, 34.576159768), (31.147637834, 35.06787246), (30.101580295, 36.031020228), (29.567134533, 36.501054535), (26.856787595, 38.778313639), (24.550582917, 40.384325472), (20.890041552, 42.47849974), (19.636115903, 43.123761403), (17.703471684, 44.01067886), (17.048967242, 44.293434078), (15.733188711, 44.827093949), (15.071549163, 45.078271992), (11.744943292, 46.257335392), (9.025190072, 46.956566279), (4.859147554, 47.644767103), (3.455979938, 47.813706456), (1.328883106, 47.973856364), (0.6186853, 48.011419961), (-0.796199225, 48.054972454), (-1.502092621, 48.06105803), (-5.023934167, 48.014237149), (-7.817182412, 47.731371248), (-11.278596108, 47.072391218), (-11.96936046, 46.925213328), (-13.347812594, 46.599690607), (-14.03708102, 46.420880282), (-16.087853103, 45.84036778), (-17.428630402, 45.396086399), (-21.374271765, 43.89689302), (-23.903005899, 42.67684778), (-26.936352555, 40.875077272), (-27.536597899, 40.500788916), (-28.724048455, 39.723926887), (-29.311972723, 39.320747942), (-31.039486686, 38.080104884), (-32.148213344, 37.208324215), (-35.349169758, 34.462697204), (-37.317082683, 32.459509238), (-39.567440801, 29.737522075), (-40.006964214, 29.18215008), (-40.86456786, 28.049096194), (-41.281778161, 27.472452922), (-42.490525828, 25.724130807), (-43.242666913, 24.529670436), (-45.341238448, 20.861286589), (-46.530959758, 18.302975659), (-47.506067229, 15.629095748)],
                knots=[0, 0, 0, 0, 0.0078125, 0.0078125, 0.015625, 0.015625, 0.03125, 0.046875, 0.046875, 0.0546875, 0.0546875, 0.0625, 0.0625, 0.09375, 0.09375, 0.1015625, 0.1015625, 0.109375, 0.109375, 0.125, 0.125, 0.140625, 0.140625, 0.1484375, 0.1484375, 0.15625, 0.15625, 0.1875, 0.1875, 0.203125, 0.203125, 0.2109375, 0.2109375, 0.21875, 0.21875, 0.25, 0.25, 0.2578125, 0.2578125, 0.265625, 0.265625, 0.28125, 0.28125, 0.3125, 0.3125, 0.3203125, 0.3203125, 0.328125, 0.328125, 0.34375, 0.359375, 0.359375, 0.3671875, 0.3671875, 0.375, 0.375, 0.40625, 0.40625, 0.421875, 0.421875, 0.4296875, 0.4296875, 0.4375, 0.4375, 0.46875, 0.46875, 0.4765625, 0.4765625, 0.484375, 0.484375, 0.5, 0.5, 0.53125, 0.53125, 0.5390625, 0.5390625, 0.546875, 0.546875, 0.5625, 0.578125, 0.578125, 0.5859375, 0.5859375, 0.59375, 0.59375, 0.625, 0.625, 0.640625, 0.640625, 0.6484375, 0.6484375, 0.65625, 0.65625, 0.6875, 0.6875, 0.703125, 0.703125, 0.7109375, 0.7109375, 0.71875, 0.71875, 0.75, 0.75, 0.765625, 0.765625, 0.7734375, 0.7734375, 0.78125, 0.78125, 0.8125, 0.8125, 0.8203125, 0.8203125, 0.828125, 0.828125, 0.84375, 0.84375, 0.875, 0.875, 0.8828125, 0.8828125, 0.890625, 0.890625, 0.90625, 0.90625, 0.9375, 0.9375, 0.9453125, 0.9453125, 0.953125, 0.953125, 0.96875, 0.96875, 1, 1, 1, 1], degree=3))
        make_face(mode=Mode.SUBTRACT)
    extrude(amount=CLEARANCING_DEPTH, mode=Mode.SUBTRACT)

    # #10 (0.1935) Diameter Slot1 outline → #10 (0.1935) Diameter Slot1 (cut)
    with BuildSketch(Plane.XY.offset(F_10_START)):
        with BuildLine():
            ThreePointArc((20.8149903, -56.6734582), (24.025803458, -58.003420556), (25.355765815, -54.792607398))
            Line((25.355765815, -54.792607398), (24.869757855, -53.619280392))
            ThreePointArc((24.869757855, -53.619280392), (21.658944697, -52.289318035), (20.328982341, -55.500131193))
            Line((20.328982341, -55.500131193), (20.8149903, -56.6734582))
        make_face()
    f_10_0_1935_diameter_slot1 = extrude(amount=F_10_0_1935_DIAMETER_SLOT1_DEPTH, mode=Mode.SUBTRACT)

    # CirPattern2: #10 (0.1935) Diameter Slot1 ×8 about axis, 4 skipped
    cirpattern2_axis = Axis((0, 0, -50.361336866), (0, 0, 1))
    add([f_10_0_1935_diameter_slot1.rotate(cirpattern2_axis, i * 360 / CIRPATTERN2_COUNT) for i in range(1, CIRPATTERN2_COUNT) if i not in (1, 2, 4, 7)], mode=Mode.SUBTRACT)


solid = part.part
